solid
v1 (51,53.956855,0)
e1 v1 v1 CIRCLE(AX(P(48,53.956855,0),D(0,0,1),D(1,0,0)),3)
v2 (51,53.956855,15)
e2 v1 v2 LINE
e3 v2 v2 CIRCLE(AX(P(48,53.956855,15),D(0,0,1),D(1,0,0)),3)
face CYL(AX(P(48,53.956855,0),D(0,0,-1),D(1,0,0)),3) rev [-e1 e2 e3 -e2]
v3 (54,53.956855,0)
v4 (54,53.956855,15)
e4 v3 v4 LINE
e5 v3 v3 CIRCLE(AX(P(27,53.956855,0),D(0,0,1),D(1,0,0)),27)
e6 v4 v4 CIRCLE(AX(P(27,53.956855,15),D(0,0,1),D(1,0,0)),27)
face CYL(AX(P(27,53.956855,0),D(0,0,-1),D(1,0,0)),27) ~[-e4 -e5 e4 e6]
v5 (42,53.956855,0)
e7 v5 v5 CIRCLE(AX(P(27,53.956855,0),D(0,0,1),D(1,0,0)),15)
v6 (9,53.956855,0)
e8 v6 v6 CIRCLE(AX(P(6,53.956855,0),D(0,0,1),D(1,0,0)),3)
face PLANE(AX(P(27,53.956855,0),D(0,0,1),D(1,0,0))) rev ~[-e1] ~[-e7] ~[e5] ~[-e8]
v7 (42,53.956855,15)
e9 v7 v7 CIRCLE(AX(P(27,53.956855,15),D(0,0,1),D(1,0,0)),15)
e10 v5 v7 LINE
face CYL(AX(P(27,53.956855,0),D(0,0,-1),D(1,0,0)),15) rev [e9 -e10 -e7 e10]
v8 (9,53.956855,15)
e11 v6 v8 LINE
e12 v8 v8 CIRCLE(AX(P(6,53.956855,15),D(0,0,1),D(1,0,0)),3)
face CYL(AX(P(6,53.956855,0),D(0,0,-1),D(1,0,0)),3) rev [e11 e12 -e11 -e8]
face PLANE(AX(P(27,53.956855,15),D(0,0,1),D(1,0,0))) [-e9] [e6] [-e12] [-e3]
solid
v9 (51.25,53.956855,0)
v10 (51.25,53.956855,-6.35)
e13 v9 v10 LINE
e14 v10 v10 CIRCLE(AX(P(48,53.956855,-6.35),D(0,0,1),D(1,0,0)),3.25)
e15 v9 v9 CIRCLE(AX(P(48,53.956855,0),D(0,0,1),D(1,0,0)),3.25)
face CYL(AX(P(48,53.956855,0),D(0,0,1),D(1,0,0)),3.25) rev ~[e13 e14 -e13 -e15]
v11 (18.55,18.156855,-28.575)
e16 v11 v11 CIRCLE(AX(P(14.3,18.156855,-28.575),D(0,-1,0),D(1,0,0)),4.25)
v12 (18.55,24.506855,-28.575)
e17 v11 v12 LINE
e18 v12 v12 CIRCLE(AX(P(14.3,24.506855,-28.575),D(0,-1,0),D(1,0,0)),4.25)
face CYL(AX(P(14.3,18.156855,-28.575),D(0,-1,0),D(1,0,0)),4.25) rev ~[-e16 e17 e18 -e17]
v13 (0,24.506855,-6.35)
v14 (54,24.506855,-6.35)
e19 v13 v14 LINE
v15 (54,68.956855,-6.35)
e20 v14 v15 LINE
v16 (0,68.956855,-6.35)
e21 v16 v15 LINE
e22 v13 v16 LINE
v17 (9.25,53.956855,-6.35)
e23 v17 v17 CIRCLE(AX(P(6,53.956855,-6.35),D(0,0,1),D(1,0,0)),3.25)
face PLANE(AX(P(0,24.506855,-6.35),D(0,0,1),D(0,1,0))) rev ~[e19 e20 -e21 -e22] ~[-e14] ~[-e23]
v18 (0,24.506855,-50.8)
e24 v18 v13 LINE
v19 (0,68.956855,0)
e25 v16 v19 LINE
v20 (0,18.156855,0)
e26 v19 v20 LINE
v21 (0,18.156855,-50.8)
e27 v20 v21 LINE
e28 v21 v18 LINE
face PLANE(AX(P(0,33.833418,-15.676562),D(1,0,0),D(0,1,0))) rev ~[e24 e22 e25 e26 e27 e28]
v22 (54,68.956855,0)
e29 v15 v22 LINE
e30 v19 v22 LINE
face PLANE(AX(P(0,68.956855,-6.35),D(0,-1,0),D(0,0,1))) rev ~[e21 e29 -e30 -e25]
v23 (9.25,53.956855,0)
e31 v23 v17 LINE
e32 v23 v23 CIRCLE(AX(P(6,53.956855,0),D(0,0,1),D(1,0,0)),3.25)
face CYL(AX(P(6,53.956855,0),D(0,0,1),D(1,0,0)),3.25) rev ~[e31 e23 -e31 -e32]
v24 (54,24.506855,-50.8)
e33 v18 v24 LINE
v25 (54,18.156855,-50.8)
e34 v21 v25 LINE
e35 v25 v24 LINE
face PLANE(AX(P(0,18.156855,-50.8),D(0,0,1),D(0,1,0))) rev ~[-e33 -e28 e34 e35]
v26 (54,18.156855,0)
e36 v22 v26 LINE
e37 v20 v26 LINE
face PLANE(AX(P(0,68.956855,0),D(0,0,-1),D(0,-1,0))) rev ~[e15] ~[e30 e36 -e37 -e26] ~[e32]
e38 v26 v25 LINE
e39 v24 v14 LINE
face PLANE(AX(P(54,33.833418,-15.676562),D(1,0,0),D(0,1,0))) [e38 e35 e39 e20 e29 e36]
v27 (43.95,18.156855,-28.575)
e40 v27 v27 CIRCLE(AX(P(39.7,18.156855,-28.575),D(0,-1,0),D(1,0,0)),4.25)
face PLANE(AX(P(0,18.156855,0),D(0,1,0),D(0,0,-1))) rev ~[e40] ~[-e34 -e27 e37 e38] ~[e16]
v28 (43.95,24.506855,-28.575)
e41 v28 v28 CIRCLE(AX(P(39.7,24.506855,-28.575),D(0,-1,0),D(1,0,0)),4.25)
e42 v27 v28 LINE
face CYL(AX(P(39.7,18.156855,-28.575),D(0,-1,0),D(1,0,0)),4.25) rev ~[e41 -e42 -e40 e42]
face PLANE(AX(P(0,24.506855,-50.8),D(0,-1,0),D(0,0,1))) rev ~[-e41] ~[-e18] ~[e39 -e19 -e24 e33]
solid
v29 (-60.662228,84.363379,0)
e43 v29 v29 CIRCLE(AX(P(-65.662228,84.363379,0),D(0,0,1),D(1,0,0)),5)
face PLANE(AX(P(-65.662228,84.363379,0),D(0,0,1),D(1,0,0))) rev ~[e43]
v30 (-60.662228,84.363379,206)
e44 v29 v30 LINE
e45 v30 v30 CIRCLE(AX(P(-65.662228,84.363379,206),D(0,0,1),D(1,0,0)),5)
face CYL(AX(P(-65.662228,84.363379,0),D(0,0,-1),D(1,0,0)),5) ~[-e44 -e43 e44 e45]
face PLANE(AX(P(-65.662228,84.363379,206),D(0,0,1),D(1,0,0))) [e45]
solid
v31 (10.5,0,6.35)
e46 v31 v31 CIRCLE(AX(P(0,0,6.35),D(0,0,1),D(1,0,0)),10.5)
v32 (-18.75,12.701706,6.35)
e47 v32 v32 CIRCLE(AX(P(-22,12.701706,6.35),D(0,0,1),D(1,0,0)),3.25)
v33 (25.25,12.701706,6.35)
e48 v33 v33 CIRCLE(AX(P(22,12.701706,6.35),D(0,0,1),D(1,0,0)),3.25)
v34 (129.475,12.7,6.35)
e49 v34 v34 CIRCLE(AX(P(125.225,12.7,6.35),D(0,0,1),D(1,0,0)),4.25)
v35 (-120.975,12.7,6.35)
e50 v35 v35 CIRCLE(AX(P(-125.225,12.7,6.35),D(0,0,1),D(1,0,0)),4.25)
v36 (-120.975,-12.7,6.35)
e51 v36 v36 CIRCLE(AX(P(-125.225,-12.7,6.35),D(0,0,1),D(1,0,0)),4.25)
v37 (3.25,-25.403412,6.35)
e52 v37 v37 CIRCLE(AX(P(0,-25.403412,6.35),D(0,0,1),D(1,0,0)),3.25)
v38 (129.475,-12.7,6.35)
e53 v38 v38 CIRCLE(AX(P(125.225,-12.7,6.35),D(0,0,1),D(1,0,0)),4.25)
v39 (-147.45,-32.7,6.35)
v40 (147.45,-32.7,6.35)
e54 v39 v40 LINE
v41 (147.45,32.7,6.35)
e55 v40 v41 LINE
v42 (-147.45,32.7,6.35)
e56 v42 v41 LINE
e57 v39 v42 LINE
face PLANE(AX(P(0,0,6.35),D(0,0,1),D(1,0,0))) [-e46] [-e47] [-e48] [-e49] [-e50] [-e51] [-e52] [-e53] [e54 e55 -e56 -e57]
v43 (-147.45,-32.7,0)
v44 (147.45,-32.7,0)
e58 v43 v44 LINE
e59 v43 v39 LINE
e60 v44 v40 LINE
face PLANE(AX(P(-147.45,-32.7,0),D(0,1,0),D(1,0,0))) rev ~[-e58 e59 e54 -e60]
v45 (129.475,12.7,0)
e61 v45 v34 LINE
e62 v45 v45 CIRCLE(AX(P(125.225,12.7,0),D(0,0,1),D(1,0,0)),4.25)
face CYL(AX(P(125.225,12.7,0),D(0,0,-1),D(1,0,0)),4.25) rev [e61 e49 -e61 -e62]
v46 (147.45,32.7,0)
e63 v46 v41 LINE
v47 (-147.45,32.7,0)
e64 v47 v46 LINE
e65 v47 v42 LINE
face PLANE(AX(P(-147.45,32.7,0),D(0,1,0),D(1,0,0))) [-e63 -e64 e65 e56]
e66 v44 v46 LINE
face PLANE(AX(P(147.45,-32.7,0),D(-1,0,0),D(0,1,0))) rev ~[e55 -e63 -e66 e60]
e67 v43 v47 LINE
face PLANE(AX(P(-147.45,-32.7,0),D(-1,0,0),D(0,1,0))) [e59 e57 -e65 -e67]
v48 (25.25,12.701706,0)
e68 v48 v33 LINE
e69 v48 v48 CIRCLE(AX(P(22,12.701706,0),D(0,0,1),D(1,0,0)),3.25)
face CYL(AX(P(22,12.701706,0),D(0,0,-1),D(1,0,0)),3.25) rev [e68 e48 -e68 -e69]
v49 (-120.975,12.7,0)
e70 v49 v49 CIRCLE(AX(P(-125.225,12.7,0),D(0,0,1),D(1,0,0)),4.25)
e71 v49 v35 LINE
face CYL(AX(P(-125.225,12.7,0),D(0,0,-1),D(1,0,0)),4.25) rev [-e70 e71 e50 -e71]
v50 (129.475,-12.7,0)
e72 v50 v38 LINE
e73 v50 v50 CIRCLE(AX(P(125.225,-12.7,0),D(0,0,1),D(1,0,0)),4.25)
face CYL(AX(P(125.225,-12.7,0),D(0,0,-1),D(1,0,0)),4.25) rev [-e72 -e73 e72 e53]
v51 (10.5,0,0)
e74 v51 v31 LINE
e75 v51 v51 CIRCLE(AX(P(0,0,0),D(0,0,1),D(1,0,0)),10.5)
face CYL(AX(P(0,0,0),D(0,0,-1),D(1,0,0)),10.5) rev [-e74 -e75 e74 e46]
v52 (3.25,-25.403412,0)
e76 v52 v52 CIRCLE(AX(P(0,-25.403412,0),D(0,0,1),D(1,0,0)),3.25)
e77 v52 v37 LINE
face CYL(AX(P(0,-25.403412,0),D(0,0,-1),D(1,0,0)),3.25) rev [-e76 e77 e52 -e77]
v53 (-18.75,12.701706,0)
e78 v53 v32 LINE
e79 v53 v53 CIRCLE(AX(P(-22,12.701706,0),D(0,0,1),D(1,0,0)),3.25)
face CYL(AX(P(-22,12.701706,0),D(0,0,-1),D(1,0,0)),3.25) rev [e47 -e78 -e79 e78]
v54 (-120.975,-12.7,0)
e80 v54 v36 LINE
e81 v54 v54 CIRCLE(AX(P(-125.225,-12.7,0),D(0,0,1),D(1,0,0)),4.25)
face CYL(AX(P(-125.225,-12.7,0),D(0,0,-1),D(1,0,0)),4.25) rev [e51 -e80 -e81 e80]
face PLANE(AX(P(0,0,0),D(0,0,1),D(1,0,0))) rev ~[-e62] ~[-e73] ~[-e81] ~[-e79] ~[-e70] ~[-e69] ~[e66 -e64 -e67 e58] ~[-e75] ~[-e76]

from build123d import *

# Parameters (mm, degrees)
F1_R      = 27
F1_R_2    = 3
F1_R_3    = 15
F2_DEPTH  = 15
F3_R      = 5
F4_DEPTH  = 206
F6_DEPTH  = 54
F7_R      = 3.25
F8_DEPTH  = 25
F9_R      = 4.25
F10_DEPTH = 25
F0_W      = 294.9
F0_H      = 65.4
F0_R      = 3.25
F0_R_2    = 4.25
F0_R_3    = 10.5
F11_DEPTH = 6.35


# Not quite as in the source:
# - a length typed as a fraction of an inch, garbled in the dataset ("3 / 203.2 mm" for 3/8 in), is restored


with BuildPart() as f2:
    # F1 (on Top) → F2 (new body)
    with BuildSketch(Plane.XY):
        with Locations((27, 53.9568550885)):
            Circle(F1_R)
        with Locations((6, 53.9568550885)):
            Circle(F1_R_2, mode=Mode.SUBTRACT)
        with Locations((27, 53.9568550885)):
            Circle(F1_R_3, mode=Mode.SUBTRACT)
        with Locations((48, 53.9568550885)):
            Circle(F1_R_2, mode=Mode.SUBTRACT)
    extrude(amount=F2_DEPTH)


with BuildPart() as f4:
    # F3 (on Top) → F4 (new body)
    with BuildSketch(Plane.XY):
        with Locations((-65.662227571, 84.3633785844)):
            Circle(F3_R)
    extrude(amount=F4_DEPTH)


with BuildPart() as f6:
    # F5 (on Right) → F6 (new body)
    with BuildSketch(Plane.YZ):
        Polygon((68.9568550885, -6.35), (68.9568550885, 0), (18.1568550885, 0), (18.1568550885, -50.8), (24.5068550885, -50.8), (24.5068550885, -6.35), align=None)
    extrude(amount=F6_DEPTH)

    # F7 (on face) → F8 (cut)
    with BuildSketch(Plane.XY):
        with Locations((6, 53.9568550885)):
            Circle(F7_R)
        with Locations((48, 53.9568550885)):
            Circle(F7_R)
    extrude(amount=-F8_DEPTH, mode=Mode.SUBTRACT)

    # F9 (on face) → F10 (cut)
    with BuildSketch(Plane.XZ.offset(-18.1568550885)):
        with Locations((14.3, -28.575)):
            Circle(F9_R)
        with Locations((39.7, -28.575)):
            Circle(F9_R)
    extrude(amount=-F10_DEPTH, mode=Mode.SUBTRACT)


with BuildPart() as f11:
    # F0 (on Top) → F11 (new body)
    with BuildSketch(Plane.XY):
        Rectangle(F0_W, F0_H)
        with Locations((0, -25.4034118443)):
            Circle(F0_R, mode=Mode.SUBTRACT)
        with Locations((-125.225, -12.7)):
            Circle(F0_R_2, mode=Mode.SUBTRACT)
        with Locations((125.225, -12.7)):
            Circle(F0_R_2, mode=Mode.SUBTRACT)
        with Locations((-125.225, 12.7)):
            Circle(F0_R_2, mode=Mode.SUBTRACT)
        Circle(F0_R_3, mode=Mode.SUBTRACT)
        with Locations((-22, 12.7017059222)):
            Circle(F0_R, mode=Mode.SUBTRACT)
        with Locations((22, 12.7017059222)):
            Circle(F0_R, mode=Mode.SUBTRACT)
        with Locations((125.225, 12.7)):
            Circle(F0_R_2, mode=Mode.SUBTRACT)
    extrude(amount=F11_DEPTH)


solid = Compound([f2.part, f4.part, f6.part, f11.part])
